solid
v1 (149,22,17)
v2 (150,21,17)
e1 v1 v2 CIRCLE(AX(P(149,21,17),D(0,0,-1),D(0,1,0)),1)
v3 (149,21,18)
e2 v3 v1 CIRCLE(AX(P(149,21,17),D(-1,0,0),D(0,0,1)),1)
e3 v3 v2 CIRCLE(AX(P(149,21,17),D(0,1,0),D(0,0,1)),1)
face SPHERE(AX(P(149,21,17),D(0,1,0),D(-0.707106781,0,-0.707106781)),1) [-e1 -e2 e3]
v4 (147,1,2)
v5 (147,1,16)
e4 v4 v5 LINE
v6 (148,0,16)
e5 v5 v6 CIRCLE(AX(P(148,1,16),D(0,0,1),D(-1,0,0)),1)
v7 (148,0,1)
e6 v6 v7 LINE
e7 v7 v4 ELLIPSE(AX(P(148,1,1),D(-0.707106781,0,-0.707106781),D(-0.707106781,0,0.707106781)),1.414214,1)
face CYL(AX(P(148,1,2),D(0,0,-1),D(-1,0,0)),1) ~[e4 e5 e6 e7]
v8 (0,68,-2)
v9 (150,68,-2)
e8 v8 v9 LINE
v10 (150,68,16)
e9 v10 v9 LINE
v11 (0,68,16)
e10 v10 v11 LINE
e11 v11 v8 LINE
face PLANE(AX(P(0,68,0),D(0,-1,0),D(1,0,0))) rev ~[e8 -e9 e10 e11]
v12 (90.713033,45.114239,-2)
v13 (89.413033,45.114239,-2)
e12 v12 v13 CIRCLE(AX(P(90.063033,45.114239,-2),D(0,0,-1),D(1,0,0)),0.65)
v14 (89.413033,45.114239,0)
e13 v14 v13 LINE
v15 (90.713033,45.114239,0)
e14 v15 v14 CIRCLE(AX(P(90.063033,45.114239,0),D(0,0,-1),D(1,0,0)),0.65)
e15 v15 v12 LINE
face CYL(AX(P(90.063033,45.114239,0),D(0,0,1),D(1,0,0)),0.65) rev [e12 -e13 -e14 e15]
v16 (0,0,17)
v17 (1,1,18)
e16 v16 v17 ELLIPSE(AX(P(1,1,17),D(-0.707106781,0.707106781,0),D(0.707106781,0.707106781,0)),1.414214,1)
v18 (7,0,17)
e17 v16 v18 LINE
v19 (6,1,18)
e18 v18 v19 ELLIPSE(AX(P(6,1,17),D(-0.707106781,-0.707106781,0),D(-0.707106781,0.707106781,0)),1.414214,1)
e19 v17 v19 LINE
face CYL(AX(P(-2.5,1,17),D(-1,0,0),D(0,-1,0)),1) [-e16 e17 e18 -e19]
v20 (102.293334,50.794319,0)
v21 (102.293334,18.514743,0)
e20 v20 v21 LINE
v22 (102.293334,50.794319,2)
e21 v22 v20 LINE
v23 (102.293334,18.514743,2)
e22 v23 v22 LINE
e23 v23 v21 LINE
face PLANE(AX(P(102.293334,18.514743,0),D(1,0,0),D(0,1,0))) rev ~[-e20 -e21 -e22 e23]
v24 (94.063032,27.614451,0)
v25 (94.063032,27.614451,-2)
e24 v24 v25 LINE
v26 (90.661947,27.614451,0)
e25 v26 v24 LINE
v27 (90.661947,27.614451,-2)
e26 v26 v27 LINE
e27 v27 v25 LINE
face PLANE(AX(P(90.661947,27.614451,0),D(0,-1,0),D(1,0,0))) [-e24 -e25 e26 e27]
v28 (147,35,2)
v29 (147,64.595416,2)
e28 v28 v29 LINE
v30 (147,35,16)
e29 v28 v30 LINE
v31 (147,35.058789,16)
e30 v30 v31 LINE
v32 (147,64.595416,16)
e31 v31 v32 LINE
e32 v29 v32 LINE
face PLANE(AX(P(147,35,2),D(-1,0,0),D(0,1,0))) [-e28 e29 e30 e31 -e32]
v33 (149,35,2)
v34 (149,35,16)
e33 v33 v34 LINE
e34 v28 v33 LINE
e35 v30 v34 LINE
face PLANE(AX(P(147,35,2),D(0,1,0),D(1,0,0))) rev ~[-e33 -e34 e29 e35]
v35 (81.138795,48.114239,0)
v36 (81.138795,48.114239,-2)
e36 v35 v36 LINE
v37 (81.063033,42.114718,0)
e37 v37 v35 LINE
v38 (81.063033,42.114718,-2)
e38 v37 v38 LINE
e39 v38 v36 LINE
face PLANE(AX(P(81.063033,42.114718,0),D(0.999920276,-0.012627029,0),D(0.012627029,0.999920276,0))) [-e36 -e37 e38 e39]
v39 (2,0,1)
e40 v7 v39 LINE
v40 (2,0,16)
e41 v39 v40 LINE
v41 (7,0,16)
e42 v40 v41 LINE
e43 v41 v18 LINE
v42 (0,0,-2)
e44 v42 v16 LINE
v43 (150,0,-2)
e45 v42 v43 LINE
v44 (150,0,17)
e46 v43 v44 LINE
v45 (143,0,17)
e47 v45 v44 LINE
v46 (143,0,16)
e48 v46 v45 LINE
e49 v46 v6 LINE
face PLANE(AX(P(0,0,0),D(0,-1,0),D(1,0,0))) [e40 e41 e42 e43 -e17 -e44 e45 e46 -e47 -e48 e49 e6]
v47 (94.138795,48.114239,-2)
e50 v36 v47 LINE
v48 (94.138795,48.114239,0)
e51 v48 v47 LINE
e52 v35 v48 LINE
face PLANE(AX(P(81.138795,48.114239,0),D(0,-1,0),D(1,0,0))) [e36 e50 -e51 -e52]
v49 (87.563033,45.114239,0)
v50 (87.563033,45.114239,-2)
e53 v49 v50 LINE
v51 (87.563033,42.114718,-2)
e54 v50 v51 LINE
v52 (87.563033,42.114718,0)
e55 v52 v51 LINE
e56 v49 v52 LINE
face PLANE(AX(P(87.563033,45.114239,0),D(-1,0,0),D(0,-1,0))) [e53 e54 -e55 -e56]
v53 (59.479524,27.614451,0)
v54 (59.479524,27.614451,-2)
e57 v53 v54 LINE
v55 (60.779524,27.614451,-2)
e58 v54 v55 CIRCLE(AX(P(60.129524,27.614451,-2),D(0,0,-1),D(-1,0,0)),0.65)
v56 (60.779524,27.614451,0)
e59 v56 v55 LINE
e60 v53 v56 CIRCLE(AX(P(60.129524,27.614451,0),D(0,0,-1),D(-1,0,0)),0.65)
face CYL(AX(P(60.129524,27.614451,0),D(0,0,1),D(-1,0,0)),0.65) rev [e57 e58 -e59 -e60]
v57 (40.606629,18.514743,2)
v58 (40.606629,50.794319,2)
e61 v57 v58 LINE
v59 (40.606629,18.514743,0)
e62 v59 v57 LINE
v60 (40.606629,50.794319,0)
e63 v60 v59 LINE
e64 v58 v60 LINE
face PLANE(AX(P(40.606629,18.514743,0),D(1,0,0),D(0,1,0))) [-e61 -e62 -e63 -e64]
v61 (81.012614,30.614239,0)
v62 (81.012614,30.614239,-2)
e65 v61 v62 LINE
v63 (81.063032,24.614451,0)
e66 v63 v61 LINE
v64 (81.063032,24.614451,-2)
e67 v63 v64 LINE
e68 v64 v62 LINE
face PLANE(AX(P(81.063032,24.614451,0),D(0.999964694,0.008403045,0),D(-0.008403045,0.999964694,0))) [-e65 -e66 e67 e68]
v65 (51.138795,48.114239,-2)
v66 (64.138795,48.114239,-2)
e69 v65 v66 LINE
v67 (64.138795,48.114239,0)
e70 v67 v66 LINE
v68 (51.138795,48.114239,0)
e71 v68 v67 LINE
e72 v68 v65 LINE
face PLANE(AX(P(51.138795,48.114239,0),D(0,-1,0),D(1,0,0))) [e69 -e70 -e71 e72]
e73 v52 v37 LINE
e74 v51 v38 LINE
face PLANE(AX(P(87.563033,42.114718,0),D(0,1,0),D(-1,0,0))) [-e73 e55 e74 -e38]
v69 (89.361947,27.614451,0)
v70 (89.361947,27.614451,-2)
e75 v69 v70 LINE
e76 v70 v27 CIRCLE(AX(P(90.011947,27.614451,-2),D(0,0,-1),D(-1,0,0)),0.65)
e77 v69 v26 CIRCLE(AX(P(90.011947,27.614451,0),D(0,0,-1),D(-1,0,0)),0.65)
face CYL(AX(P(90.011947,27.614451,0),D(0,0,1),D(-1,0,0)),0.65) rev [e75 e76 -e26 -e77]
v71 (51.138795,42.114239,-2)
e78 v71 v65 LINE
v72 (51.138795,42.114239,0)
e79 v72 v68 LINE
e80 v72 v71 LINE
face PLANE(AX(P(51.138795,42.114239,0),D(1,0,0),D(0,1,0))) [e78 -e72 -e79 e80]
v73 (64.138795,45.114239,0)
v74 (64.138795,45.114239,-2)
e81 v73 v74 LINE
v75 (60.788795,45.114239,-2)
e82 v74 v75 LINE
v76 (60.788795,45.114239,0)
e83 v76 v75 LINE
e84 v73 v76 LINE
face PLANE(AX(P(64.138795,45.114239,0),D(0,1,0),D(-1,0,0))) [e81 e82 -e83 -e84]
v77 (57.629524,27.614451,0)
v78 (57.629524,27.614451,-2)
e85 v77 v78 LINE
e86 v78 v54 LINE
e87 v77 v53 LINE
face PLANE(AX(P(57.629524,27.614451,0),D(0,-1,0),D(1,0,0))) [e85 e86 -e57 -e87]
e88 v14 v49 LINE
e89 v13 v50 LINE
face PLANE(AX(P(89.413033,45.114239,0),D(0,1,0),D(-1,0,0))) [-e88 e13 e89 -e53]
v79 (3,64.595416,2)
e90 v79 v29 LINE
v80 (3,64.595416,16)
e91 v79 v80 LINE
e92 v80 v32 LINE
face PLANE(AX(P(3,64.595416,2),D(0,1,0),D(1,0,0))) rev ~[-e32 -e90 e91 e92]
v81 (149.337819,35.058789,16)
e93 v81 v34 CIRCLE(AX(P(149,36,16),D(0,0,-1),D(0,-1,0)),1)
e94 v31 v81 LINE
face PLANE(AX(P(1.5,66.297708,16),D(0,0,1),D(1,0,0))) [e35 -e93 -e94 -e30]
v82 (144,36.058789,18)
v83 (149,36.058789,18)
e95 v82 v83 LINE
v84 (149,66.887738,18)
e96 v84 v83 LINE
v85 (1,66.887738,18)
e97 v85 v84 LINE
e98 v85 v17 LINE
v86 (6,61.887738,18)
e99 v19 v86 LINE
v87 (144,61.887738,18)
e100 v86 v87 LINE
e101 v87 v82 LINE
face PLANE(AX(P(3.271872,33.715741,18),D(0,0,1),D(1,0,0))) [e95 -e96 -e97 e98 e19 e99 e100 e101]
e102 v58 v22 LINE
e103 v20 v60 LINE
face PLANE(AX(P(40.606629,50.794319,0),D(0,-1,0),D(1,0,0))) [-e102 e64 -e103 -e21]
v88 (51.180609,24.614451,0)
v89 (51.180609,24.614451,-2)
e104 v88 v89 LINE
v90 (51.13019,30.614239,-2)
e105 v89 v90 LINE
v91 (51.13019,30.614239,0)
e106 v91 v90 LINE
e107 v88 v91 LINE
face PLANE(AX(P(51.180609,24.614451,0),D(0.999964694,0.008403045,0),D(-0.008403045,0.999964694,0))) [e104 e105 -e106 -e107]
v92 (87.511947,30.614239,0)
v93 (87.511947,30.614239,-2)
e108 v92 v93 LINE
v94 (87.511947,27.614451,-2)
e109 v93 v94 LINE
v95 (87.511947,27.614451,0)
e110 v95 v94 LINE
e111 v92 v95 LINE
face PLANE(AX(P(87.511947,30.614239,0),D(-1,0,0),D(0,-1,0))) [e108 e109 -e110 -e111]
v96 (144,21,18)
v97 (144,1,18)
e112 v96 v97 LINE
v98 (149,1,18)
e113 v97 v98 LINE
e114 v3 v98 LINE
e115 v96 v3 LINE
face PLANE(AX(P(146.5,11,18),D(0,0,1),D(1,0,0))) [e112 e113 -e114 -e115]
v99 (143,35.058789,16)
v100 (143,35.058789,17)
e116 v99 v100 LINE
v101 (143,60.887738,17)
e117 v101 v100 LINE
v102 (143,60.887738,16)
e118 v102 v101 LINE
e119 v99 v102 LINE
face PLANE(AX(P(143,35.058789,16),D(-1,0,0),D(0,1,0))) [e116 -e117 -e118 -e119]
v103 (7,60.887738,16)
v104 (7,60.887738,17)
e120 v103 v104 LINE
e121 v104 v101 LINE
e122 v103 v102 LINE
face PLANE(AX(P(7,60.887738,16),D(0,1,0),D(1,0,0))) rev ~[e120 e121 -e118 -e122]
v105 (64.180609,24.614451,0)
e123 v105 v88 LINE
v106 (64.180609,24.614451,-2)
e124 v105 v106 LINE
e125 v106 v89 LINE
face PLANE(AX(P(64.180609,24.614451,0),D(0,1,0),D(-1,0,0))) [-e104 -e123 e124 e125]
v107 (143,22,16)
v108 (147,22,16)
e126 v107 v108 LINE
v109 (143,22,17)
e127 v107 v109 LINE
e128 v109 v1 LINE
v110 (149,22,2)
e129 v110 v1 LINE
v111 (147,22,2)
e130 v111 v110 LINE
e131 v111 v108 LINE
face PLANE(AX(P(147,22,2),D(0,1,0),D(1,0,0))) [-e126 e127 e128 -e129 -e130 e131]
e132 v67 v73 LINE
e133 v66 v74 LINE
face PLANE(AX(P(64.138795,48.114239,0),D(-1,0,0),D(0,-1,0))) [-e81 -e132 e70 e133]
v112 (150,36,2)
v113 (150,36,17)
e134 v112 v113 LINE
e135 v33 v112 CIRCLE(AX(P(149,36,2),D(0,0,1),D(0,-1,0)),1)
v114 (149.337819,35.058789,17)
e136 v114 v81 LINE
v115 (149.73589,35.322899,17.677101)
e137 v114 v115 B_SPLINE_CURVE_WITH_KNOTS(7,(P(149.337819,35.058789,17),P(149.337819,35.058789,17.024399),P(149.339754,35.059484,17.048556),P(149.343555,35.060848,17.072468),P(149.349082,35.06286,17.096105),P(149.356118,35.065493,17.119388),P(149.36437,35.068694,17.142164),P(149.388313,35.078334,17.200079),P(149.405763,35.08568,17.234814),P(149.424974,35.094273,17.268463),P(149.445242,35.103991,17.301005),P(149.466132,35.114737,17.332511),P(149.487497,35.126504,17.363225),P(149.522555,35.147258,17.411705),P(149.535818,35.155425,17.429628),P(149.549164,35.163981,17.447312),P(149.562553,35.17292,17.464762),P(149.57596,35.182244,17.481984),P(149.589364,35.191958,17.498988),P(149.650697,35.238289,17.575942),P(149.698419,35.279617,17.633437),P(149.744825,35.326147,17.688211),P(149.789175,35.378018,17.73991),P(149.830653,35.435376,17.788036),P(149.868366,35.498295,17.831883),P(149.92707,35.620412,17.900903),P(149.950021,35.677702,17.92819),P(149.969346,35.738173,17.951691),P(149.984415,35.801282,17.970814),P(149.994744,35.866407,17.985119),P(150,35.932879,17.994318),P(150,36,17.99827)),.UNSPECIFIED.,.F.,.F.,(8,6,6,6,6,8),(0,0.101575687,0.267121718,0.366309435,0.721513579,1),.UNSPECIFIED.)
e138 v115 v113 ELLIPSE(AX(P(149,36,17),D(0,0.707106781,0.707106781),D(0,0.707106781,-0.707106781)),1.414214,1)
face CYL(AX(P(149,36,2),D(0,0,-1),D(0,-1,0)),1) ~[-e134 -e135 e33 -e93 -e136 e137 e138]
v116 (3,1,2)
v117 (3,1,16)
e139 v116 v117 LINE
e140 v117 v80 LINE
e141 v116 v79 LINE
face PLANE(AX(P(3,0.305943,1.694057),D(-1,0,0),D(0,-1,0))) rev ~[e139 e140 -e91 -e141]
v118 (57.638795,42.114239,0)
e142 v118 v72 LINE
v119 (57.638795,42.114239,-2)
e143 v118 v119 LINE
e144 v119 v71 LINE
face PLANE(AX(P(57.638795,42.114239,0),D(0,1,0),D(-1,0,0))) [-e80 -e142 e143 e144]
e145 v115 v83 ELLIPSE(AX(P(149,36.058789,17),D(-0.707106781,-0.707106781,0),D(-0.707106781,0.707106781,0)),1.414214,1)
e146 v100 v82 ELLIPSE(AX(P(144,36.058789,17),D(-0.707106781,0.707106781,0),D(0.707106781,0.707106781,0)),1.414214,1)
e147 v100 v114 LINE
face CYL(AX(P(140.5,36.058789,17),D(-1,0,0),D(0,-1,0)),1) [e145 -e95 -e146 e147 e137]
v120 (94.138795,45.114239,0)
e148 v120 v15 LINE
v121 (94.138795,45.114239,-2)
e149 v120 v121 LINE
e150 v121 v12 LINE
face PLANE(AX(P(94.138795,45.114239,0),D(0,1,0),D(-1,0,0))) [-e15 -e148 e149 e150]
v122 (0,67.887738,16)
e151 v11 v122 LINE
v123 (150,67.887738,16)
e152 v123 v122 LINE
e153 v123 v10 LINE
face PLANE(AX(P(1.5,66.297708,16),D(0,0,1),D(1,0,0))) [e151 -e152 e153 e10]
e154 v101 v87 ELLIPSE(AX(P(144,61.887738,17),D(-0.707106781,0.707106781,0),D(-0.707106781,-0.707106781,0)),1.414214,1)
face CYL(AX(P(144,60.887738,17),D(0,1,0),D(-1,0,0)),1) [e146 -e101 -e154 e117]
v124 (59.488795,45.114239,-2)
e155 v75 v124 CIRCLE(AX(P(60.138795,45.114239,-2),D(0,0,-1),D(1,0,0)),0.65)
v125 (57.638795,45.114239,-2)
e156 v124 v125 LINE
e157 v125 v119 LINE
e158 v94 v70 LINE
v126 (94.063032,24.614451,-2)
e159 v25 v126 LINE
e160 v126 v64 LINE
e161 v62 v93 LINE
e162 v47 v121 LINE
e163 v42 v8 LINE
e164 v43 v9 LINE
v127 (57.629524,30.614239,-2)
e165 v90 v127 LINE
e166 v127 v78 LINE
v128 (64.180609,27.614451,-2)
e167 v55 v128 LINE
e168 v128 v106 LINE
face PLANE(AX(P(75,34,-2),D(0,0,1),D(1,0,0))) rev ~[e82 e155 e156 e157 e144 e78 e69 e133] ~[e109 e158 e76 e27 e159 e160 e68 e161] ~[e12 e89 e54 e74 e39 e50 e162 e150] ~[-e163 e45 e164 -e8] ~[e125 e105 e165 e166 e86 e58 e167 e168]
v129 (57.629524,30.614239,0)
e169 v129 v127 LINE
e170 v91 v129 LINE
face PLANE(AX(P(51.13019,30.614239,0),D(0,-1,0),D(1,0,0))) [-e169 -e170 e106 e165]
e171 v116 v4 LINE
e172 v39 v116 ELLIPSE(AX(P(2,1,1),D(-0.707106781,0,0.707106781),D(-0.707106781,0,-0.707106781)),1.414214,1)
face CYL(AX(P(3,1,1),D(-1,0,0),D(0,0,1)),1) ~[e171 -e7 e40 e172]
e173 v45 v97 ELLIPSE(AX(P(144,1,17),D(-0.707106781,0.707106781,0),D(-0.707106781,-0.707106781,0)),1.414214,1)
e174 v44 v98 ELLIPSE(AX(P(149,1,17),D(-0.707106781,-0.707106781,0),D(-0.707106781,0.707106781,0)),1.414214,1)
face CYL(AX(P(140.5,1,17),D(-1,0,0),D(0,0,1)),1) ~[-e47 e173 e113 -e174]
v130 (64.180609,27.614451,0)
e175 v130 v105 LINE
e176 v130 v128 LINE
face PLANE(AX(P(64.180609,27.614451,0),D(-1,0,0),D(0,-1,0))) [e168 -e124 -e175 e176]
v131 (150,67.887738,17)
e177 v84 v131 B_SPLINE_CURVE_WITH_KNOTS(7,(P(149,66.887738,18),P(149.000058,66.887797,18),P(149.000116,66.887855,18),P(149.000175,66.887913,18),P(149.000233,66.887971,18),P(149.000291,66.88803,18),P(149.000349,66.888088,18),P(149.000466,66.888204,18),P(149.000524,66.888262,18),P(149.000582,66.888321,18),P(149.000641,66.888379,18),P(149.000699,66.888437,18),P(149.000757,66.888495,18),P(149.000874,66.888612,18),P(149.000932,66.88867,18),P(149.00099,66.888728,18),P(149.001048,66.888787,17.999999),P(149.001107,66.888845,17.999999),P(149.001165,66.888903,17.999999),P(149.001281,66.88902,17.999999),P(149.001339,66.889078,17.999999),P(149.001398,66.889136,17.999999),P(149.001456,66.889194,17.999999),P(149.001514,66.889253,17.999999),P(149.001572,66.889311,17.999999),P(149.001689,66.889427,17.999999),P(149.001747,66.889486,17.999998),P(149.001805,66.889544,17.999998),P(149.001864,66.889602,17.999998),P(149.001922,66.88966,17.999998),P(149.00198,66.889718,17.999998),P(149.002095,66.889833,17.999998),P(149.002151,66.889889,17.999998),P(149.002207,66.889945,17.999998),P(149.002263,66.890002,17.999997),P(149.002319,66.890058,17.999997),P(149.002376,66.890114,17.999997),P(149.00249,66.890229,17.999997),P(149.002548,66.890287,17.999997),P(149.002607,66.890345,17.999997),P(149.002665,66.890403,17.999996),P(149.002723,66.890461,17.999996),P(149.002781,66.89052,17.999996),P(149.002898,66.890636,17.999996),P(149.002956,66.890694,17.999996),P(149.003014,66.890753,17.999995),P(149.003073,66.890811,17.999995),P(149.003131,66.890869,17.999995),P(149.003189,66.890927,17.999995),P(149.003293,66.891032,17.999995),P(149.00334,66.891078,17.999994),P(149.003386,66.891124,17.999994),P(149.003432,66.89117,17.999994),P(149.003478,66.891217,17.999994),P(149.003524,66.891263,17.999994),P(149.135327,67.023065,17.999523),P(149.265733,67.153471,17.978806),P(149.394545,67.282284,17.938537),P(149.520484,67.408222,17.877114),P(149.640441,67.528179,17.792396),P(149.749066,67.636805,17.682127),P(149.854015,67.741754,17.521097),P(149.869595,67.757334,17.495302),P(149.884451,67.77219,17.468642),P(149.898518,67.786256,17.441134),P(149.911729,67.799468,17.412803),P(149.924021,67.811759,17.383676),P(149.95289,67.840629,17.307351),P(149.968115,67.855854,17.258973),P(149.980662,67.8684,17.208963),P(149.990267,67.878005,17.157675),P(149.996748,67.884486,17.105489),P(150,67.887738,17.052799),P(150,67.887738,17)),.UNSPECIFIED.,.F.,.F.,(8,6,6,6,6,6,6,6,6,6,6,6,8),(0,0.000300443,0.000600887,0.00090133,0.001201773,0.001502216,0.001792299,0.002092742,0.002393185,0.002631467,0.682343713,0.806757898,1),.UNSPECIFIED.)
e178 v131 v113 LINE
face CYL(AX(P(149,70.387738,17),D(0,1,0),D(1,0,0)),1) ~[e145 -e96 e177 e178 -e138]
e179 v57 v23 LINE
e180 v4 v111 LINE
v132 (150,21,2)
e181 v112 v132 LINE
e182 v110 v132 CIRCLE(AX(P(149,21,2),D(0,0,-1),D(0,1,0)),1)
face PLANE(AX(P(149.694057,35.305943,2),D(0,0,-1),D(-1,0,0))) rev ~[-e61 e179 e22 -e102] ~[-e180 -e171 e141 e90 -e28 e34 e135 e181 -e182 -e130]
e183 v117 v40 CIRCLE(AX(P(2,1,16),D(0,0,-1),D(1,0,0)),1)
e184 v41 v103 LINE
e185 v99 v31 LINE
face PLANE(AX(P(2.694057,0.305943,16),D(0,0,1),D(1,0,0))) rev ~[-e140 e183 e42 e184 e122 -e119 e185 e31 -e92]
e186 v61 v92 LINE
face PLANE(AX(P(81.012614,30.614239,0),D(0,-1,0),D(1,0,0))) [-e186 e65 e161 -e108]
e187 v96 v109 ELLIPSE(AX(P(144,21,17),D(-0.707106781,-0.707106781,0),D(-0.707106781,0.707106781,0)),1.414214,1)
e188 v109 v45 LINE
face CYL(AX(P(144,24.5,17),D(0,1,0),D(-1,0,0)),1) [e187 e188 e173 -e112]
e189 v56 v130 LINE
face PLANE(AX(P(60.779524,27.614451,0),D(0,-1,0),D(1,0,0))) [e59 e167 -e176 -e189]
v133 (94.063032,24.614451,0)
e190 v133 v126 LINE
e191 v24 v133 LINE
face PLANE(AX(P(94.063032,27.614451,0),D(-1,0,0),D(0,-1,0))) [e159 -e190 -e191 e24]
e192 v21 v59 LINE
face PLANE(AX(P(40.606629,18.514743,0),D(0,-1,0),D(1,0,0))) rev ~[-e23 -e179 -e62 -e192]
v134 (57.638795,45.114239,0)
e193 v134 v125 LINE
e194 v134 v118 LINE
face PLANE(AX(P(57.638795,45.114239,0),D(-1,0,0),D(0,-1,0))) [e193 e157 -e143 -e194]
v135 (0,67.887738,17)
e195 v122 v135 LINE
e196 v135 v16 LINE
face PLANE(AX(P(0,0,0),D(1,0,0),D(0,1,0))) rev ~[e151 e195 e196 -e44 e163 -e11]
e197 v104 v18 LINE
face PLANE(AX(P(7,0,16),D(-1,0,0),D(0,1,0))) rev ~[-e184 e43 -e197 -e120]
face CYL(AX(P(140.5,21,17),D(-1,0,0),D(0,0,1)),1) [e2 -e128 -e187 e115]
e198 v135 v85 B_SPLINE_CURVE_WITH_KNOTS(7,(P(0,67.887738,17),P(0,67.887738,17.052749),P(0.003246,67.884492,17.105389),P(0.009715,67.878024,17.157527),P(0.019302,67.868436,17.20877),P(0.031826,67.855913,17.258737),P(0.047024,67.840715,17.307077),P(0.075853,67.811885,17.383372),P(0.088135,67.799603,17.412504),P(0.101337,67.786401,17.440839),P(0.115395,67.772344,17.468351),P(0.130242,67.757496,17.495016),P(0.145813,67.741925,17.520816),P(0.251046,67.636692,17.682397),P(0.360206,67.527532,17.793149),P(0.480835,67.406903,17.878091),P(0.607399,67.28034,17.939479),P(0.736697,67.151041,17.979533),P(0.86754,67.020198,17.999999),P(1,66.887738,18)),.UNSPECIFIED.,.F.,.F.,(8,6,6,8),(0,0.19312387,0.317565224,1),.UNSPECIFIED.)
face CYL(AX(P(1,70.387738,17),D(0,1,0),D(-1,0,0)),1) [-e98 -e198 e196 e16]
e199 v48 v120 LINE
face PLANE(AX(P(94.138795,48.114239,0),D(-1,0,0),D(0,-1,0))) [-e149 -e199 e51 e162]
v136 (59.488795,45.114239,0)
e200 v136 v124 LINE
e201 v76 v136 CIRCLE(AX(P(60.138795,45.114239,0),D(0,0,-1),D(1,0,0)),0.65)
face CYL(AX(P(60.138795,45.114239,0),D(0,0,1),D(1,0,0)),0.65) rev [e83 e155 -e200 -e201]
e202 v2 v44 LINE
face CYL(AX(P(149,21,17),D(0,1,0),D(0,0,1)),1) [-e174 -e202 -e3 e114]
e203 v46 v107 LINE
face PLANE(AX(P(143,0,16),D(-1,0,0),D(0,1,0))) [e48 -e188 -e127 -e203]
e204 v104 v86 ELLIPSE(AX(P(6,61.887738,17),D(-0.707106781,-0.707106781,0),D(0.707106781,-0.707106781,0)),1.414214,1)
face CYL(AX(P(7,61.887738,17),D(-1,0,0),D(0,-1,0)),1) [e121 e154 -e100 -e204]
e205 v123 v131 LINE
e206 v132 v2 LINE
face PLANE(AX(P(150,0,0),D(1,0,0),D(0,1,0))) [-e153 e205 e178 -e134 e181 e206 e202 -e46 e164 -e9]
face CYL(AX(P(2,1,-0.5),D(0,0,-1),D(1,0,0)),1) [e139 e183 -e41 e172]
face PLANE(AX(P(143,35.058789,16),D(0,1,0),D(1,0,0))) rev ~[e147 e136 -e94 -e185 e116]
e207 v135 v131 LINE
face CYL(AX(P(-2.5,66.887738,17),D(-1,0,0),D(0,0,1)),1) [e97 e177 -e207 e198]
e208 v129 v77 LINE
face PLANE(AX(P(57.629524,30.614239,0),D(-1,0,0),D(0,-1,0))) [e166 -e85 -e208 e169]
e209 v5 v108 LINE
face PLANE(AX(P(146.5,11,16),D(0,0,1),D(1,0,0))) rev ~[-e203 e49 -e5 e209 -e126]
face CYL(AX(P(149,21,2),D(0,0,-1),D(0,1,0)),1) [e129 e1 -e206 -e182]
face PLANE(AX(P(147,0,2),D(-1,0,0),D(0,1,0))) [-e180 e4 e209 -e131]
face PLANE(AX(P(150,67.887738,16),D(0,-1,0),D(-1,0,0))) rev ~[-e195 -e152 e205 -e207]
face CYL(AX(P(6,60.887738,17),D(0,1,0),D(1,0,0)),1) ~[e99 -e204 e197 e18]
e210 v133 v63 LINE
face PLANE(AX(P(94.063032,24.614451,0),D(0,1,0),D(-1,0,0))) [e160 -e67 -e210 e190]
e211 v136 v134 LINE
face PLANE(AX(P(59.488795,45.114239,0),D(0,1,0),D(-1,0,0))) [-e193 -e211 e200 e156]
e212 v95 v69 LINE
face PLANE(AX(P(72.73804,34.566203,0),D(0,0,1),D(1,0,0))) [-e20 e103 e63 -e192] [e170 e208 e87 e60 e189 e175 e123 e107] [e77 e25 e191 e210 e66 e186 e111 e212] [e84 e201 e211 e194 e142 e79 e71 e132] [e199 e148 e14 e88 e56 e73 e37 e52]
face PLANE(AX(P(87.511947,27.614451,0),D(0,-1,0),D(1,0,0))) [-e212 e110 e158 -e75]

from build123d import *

# Parameters (mm, degrees)
F0_W         = 150
F0_H         = 68
F0_W_2       = 61.6867046999
F0_H_2       = 32.2795761846
F1_DEPTH     = 2
F2_W         = 3
F2_H         = 3.4045838118
F2_W_2       = 144
F2_H_2       = 64.5954161882
F2_H_3       = 29.5954161882
F2_H_4       = 22
F3_DEPTH     = 14
F4_W         = 4.8811412584
F4_H         = 7
F4_W_2       = 136
F4_W_3       = 7
F4_H_2       = 25.8289493918
F4_H_3       = 22
F5_DEPTH     = 2
F6_T1_DEPTH  = 72.8877383471
F6_T3_DEPTH  = 12
F6_T5_DEPTH  = 63.3877383471
F6_T7_DEPTH  = 136
F6_T9_DEPTH  = 28.3289493918
F6_T11_DEPTH = 12
F6_T13_DEPTH = 37.8289493918
F6_T15_DEPTH = 155
F6_T17_DEPTH = 23.5
F6_T19_DEPTH = 8.5
F6_T21_DEPTH = 27
F6_T23_DEPTH = 144
F6_T25_DEPTH = 14
F6_T27_DEPTH = 15
F6_T29_DEPTH = 16.5
F6_S33_W     = 1
F6_S33_H     = 1
F6_T34_DEPTH = 1
F6_T41_DEPTH = 65.8877383471
F6_T45_DEPTH = 138.5
F6_T52_DEPTH = 138.5
F6_T56_DEPTH = 30.8289493918
F6_T63_DEPTH = 146.5
F6_T67_DEPTH = 16.5
F6_T74_DEPTH = 146.5
F6_T78_DEPTH = 16.5
F7_W         = 150
F7_H         = 68
F7_W_2       = 61.6867046999
F7_H_2       = 32.2795761846
F8_DEPTH     = 2
F9_W         = 73.8973718075
F9_H         = 39.0960725045
F9_W_2       = 61.6867046999
F9_H_2       = 32.2795761846
F10_DEPTH    = 2


# Not quite as in the source:
# - a fillet or chamfer that OpenCascade refuses, or shapes differently, is made with other operations: its cross-section is extruded or revolved along the edge and cut away or added
# - a feature names something its author has since deleted; it is built from what else it names


with BuildPart() as f1:
    # F0 (on Top) → F1 (new body)
    with BuildSketch(Plane.XY):
        with Locations((75, 34)):
            Rectangle(F0_W, F0_H)
        with Locations((71.4499814534, 34.6545311671)):
            Rectangle(F0_W_2, F0_H_2, mode=Mode.SUBTRACT)
    extrude(amount=F1_DEPTH)

    # F2 (on face) → F3 (join)
    with BuildSketch(Plane.XY.offset(2)):
        with Locations((1.5, 66.2977080941)):
            Rectangle(F2_W, F2_H)
        with Locations((75, 66.2977080941)):
            Rectangle(F2_W_2, F2_H)
        with Locations((1.5, 32.2977080941)):
            Rectangle(F2_W, F2_H_2)
        with Locations((148.5, 66.2977080941)):
            Rectangle(F2_W, F2_H)
        with Locations((148.5, 49.7977080941)):
            Rectangle(F2_W, F2_H_3)
        with Locations((148.5, 11)):
            Rectangle(F2_W, F2_H_4)
    extrude(amount=F3_DEPTH)

    # F4 (on face) → F5 (join)
    with BuildSketch(Plane.XY.offset(16)):
        Polygon((0, 67.8877383471), (0, 0), (7, 0), (7, 60.8877383471), (2.1188587416, 60.8877383471), (2.1188587416, 67.8877383471), align=None)
        with Locations((4.5594293708, 64.3877383471)):
            Rectangle(F4_W, F4_H)
        with Locations((75, 64.3877383471)):
            Rectangle(F4_W_2, F4_H)
        with Locations((146.5, 64.3877383471)):
            Rectangle(F4_W_3, F4_H)
        with Locations((146.5, 47.9732636511)):
            Rectangle(F4_W_3, F4_H_2)
        with Locations((146.5, 11)):
            Rectangle(F4_W_3, F4_H_3)
    extrude(amount=F5_DEPTH)

    # F6: fillet of radius 1 on 17 edges, made by hand

    # F6_s2 → F6_t1 (cut)
    with BuildSketch(Plane.XZ.offset(-70.3877383471)):
        with BuildLine():
            ThreePointArc((0, 17), (0.2928932188, 17.7071067812), (1, 18))
            Line((1, 18), (0, 18))
            Line((0, 18), (0, 17))
        make_face()
    extrude(amount=F6_T1_DEPTH, mode=Mode.SUBTRACT)

    # F6_s4 → F6_t3 (cut)
    with BuildSketch(Plane.YZ.offset(-2.5)):
        with BuildLine():
            ThreePointArc((0, 17), (0.2928932188, 17.7071067812), (1, 18))
            Line((1, 18), (0, 18))
            Line((0, 18), (0, 17))
        make_face()
    extrude(amount=F6_T3_DEPTH, mode=Mode.SUBTRACT)

    # F6_s6 → F6_t5 (cut)
    with BuildSketch(Plane.XZ.offset(-60.8877383471)):
        with BuildLine():
            ThreePointArc((7, 17), (6.7071067812, 17.7071067812), (6, 18))
            Line((6, 18), (7, 18))
            Line((7, 18), (7, 17))
        make_face()
    extrude(amount=F6_T5_DEPTH, mode=Mode.SUBTRACT)

    # F6_s8 → F6_t7 (cut)
    with BuildSketch(Plane.YZ.offset(7)):
        with BuildLine():
            ThreePointArc((60.8877383471, 17), (61.1806315659, 17.7071067812), (61.8877383471, 18))
            Line((61.8877383471, 18), (60.8877383471, 18))
            Line((60.8877383471, 18), (60.8877383471, 17))
        make_face()
    extrude(amount=F6_T7_DEPTH, mode=Mode.SUBTRACT)

    # F6_s10 → F6_t9 (cut)
    with BuildSketch(Plane.XZ.offset(-60.8877383471)):
        with BuildLine():
            ThreePointArc((143, 17), (143.2928932188, 17.7071067812), (144, 18))
            Line((144, 18), (143, 18))
            Line((143, 18), (143, 17))
        make_face()
    extrude(amount=F6_T9_DEPTH, mode=Mode.SUBTRACT)

    # F6_s12 → F6_t11 (cut)
    with BuildSketch(Plane.YZ.offset(140.5)):
        with BuildLine():
            ThreePointArc((35.0587889552, 17), (35.351682174, 17.7071067812), (36.0587889552, 18))
            Line((36.0587889552, 18), (35.0587889552, 18))
            Line((35.0587889552, 18), (35.0587889552, 17))
        make_face()
        with BuildLine():
            ThreePointArc((1, 18), (0.2928932188, 17.7071067812), (0, 17))
            Line((0, 17), (0, 18))
            Line((0, 18), (1, 18))
        make_face()
    extrude(amount=F6_T11_DEPTH, mode=Mode.SUBTRACT)

    # F6_s14 → F6_t13 (cut)
    with BuildSketch(Plane.XZ.offset(-70.3877383471)):
        with BuildLine():
            ThreePointArc((150, 17), (149.7071067812, 17.7071067812), (149, 18))
            Line((149, 18), (150, 18))
            Line((150, 18), (150, 17))
        make_face()
    extrude(amount=F6_T13_DEPTH, mode=Mode.SUBTRACT)

    # F6_s16 → F6_t15 (cut)
    with BuildSketch(Plane.YZ.offset(-2.5)):
        with BuildLine():
            ThreePointArc((66.8877383471, 18), (67.5948451282, 17.7071067812), (67.8877383471, 17))
            Line((67.8877383471, 17), (67.8877383471, 18))
            Line((67.8877383471, 18), (66.8877383471, 18))
        make_face()
    extrude(amount=F6_T15_DEPTH, mode=Mode.SUBTRACT)

    # F6_s18 → F6_t17 (cut)
    with BuildSketch(Plane.XZ.offset(-21)):
        with BuildLine():
            ThreePointArc((149, 18), (149.7071067812, 17.7071067812), (150, 17))
            Line((150, 17), (150, 18))
            Line((150, 18), (149, 18))
        make_face()
    extrude(amount=F6_T17_DEPTH, mode=Mode.SUBTRACT)

    # F6_s20 → F6_t19 (cut)
    with BuildSketch(Plane.YZ.offset(140.5)):
        with BuildLine():
            ThreePointArc((21, 18), (21.7071067812, 17.7071067812), (22, 17))
            Line((22, 17), (22, 18))
            Line((22, 18), (21, 18))
        make_face()
    extrude(amount=F6_T19_DEPTH, mode=Mode.SUBTRACT)

    # F6_s22 → F6_t21 (cut)
    with BuildSketch(Plane.XZ.offset(-24.5)):
        with BuildLine():
            ThreePointArc((143, 17), (143.2928932188, 17.7071067812), (144, 18))
            Line((144, 18), (143, 18))
            Line((143, 18), (143, 17))
        make_face()
    extrude(amount=F6_T21_DEPTH, mode=Mode.SUBTRACT)

    # F6_s24 → F6_t23 (cut)
    with BuildSketch(Plane.YZ.offset(3)):
        with BuildLine():
            ThreePointArc((1, 2), (0.2928932188, 1.7071067812), (0, 1))
            Line((0, 1), (0, 2))
            Line((0, 2), (1, 2))
        make_face()
    extrude(amount=F6_T23_DEPTH, mode=Mode.SUBTRACT)

    # F6_s26 → F6_t25 (cut)
    with BuildSketch(Plane.XY.offset(2)):
        with BuildLine():
            ThreePointArc((3, 1), (2.7071067812, 0.2928932188), (2, 0))
            Line((2, 0), (3, 0))
            Line((3, 0), (3, 1))
        make_face()
        with BuildLine():
            ThreePointArc((147, 1), (147.2928932188, 0.2928932188), (148, 0))
            Line((148, 0), (147, 0))
            Line((147, 0), (147, 1))
        make_face()
    extrude(amount=F6_T25_DEPTH, mode=Mode.SUBTRACT)

    # F6_s28 → F6_t27 (cut)
    with BuildSketch(Plane.XY.offset(2)):
        with BuildLine():
            ThreePointArc((149, 22), (149.7071067812, 21.7071067812), (150, 21))
            Line((150, 21), (150, 22))
            Line((150, 22), (149, 22))
        make_face()
    extrude(amount=F6_T27_DEPTH, mode=Mode.SUBTRACT)

    # F6_s30 → F6_t29 (cut)
    with BuildSketch(Plane.XY.offset(2)):
        with BuildLine():
            ThreePointArc((149, 35), (149.7071067812, 35.2928932188), (150, 36))
            Line((150, 36), (150, 35))
            Line((150, 35), (149, 35))
        make_face()
    extrude(amount=F6_T29_DEPTH, mode=Mode.SUBTRACT)


with BuildPart() as f6_tool32:
    # F6_s33 → F6_t34 (new body)
    with BuildSketch(Plane.XZ.offset(-21)):
        with Locations((149.5, 17.5)):
            Rectangle(F6_S33_W, F6_S33_H)
    extrude(amount=-F6_T34_DEPTH)

    # F6_s35 → F6_t36 (revolve, cut)
    with BuildSketch(Plane(origin=(149, 21, 17), x_dir=(-0.7071067812, 0, -0.7071067812), z_dir=(0.7071067812, 0, -0.7071067812))):
        with BuildLine():
            ThreePointArc((0, -1), (1, 0), (0, 1))
            Line((0, 1), (0, -1))
        make_face()
    revolve(axis=Axis((149, 21, 17), (0, 1, 0)), mode=Mode.SUBTRACT)


with BuildPart() as f1_1:
    add(f1.part)

    # F6_t31: cut F6_tool32
    add(f6_tool32.part, mode=Mode.SUBTRACT)


with BuildPart() as f6_tool39:
    # F6_s40 → F6_t41 (new body)
    with BuildSketch(Plane.XZ.offset(2.5)):
        with BuildLine():
            ThreePointArc((7, 17), (6.7071067812, 17.7071067812), (6, 18))
            Line((6, 18), (7, 18))
            Line((7, 18), (7, 17))
        make_face()
    extrude(amount=-F6_T41_DEPTH)

    split(bisect_by=Plane.XZ.offset(-60.8877383471), keep=Keep.BOTTOM)


with BuildPart() as f6_tool43:
    # F6_s44 → F6_t45 (new body)
    with BuildSketch(Plane.YZ.offset(4.5)):
        with BuildLine():
            ThreePointArc((60.8877383471, 17), (61.1806315659, 17.7071067812), (61.8877383471, 18))
            Line((61.8877383471, 18), (60.8877383471, 18))
            Line((60.8877383471, 18), (60.8877383471, 17))
        make_face()
    extrude(amount=F6_T45_DEPTH)

    split(bisect_by=Plane.YZ.offset(7), keep=Keep.BOTTOM)


with BuildPart() as f6_tool39_1:
    add(f6_tool39.part)

    # F6_t47: intersect F6_tool43
    add(f6_tool43.part, mode=Mode.INTERSECT)


with BuildPart() as f1_2:
    add(f1_1.part)

    # F6_t37: cut F6_tool39
    add(f6_tool39_1.part, mode=Mode.SUBTRACT)


with BuildPart() as f6_tool50:
    # F6_s51 → F6_t52 (new body)
    with BuildSketch(Plane.YZ.offset(7)):
        with BuildLine():
            ThreePointArc((60.8877383471, 17), (61.1806315659, 17.7071067812), (61.8877383471, 18))
            Line((61.8877383471, 18), (60.8877383471, 18))
            Line((60.8877383471, 18), (60.8877383471, 17))
        make_face()
    extrude(amount=F6_T52_DEPTH)

    split(bisect_by=Plane.YZ.offset(143), keep=Keep.TOP)


with BuildPart() as f6_tool54:
    # F6_s55 → F6_t56 (new body)
    with BuildSketch(Plane.XZ.offset(-63.3877383471)):
        with BuildLine():
            ThreePointArc((143, 17), (143.2928932188, 17.7071067812), (144, 18))
            Line((144, 18), (143, 18))
            Line((143, 18), (143, 17))
        make_face()
    extrude(amount=F6_T56_DEPTH)

    split(bisect_by=Plane.XZ.offset(-60.8877383471), keep=Keep.BOTTOM)


with BuildPart() as f6_tool50_1:
    add(f6_tool50.part)

    # F6_t58: intersect F6_tool54
    add(f6_tool54.part, mode=Mode.INTERSECT)


with BuildPart() as f1_3:
    add(f1_2.part)

    # F6_t48: cut F6_tool50
    add(f6_tool50_1.part, mode=Mode.SUBTRACT)


with BuildPart() as f6_tool61:
    # F6_s62 → F6_t63 (new body)
    with BuildSketch(Plane.YZ.offset(0.5)):
        with BuildLine():
            ThreePointArc((1, 2), (0.2928932188, 1.7071067812), (0, 1))
            Line((0, 1), (0, 2))
            Line((0, 2), (1, 2))
        make_face()
    extrude(amount=F6_T63_DEPTH)

    split(bisect_by=Plane.YZ.offset(3), keep=Keep.BOTTOM)


with BuildPart() as f6_tool65:
    # F6_s66 → F6_t67 (new body)
    with BuildSketch(Plane.XY.offset(-0.5)):
        with BuildLine():
            ThreePointArc((3, 1), (2.7071067812, 0.2928932188), (2, 0))
            Line((2, 0), (3, 0))
            Line((3, 0), (3, 1))
        make_face()
    extrude(amount=F6_T67_DEPTH)

    split(bisect_by=Plane.XY.offset(2), keep=Keep.BOTTOM)


with BuildPart() as f6_tool61_1:
    add(f6_tool61.part)

    # F6_t69: intersect F6_tool65
    add(f6_tool65.part, mode=Mode.INTERSECT)


with BuildPart() as f1_4:
    add(f1_3.part)

    # F6_t59: cut F6_tool61
    add(f6_tool61_1.part, mode=Mode.SUBTRACT)


with BuildPart() as f6_tool72:
    # F6_s73 → F6_t74 (new body)
    with BuildSketch(Plane.YZ.offset(3)):
        with BuildLine():
            ThreePointArc((1, 2), (0.2928932188, 1.7071067812), (0, 1))
            Line((0, 1), (0, 2))
            Line((0, 2), (1, 2))
        make_face()
    extrude(amount=F6_T74_DEPTH)

    split(bisect_by=Plane.YZ.offset(147), keep=Keep.TOP)


with BuildPart() as f6_tool76:
    # F6_s77 → F6_t78 (new body)
    with BuildSketch(Plane.XY.offset(-0.5)):
        with BuildLine():
            ThreePointArc((147, 1), (147.2928932188, 0.2928932188), (148, 0))
            Line((148, 0), (147, 0))
            Line((147, 0), (147, 1))
        make_face()
    extrude(amount=F6_T78_DEPTH)

    split(bisect_by=Plane.XY.offset(2), keep=Keep.BOTTOM)


with BuildPart() as f6_tool72_1:
    add(f6_tool72.part)

    # F6_t80: intersect F6_tool76
    add(f6_tool76.part, mode=Mode.INTERSECT)


with BuildPart() as f1_5:
    add(f1_4.part)

    # F6_t70: cut F6_tool72
    add(f6_tool72_1.part, mode=Mode.SUBTRACT)

    # F7 (on face) → F8 (join)
    with BuildSketch(Plane.XY):
        with Locations((75, 34)):
            Rectangle(F7_W, F7_H)
        with Locations((71.4499814534, 34.6545311671)):
            Rectangle(F7_W_2, F7_H_2, mode=Mode.SUBTRACT)
    extrude(amount=-F8_DEPTH)

    # F9 (on face) → F10 (join)
    with BuildSketch(Plane.XY):
        with Locations((72.7380400409, 34.5662031323)):
            Rectangle(F9_W, F9_H)
        with Locations((71.4499814534, 34.6545311671)):
            Rectangle(F9_W_2, F9_H_2, mode=Mode.SUBTRACT)
        with Locations((71.4499814534, 34.6545311671)):
            Rectangle(F9_W_2, F9_H_2)
        with BuildLine():
            Line((64.1806087643, 24.6144512218), (51.1806087643, 24.6144512218))
            Line((51.1806087643, 24.6144512218), (51.1301904917, 30.6142393845))
            Line((51.1301904917, 30.6142393845), (57.6295237077, 30.6142393845))
            Line((57.6295237077, 30.6142393845), (57.6295237077, 27.6144512218))
            Line((57.6295237077, 27.6144512218), (59.4795237077, 27.6144512218))
            ThreePointArc((59.4795237077, 27.6144512218), (60.1295237077, 28.2644512218), (60.7795237077, 27.6144512218))
            Line((60.7795237077, 27.6144512218), (64.1806087643, 27.6144512218))
            Line((64.1806087643, 27.6144512218), (64.1806087643, 24.6144512218))
        make_face(mode=Mode.SUBTRACT)
        with BuildLine():
            Line((94.0630321503, 24.6144512218), (81.0630321503, 24.6144512218))
            Line((81.0630321503, 24.6144512218), (81.0126138777, 30.6142393845))
            Line((81.0126138777, 30.6142393845), (87.5119470937, 30.6142393845))
            Line((87.5119470937, 30.6142393845), (87.5119470937, 27.6144512218))
            Line((87.5119470937, 27.6144512218), (89.3619470937, 27.6144512218))
            ThreePointArc((89.3619470937, 27.6144512218), (90.0119470937, 28.2644512218), (90.6619470937, 27.6144512218))
            Line((90.6619470937, 27.6144512218), (94.0630321503, 27.6144512218))
            Line((94.0630321503, 27.6144512218), (94.0630321503, 24.6144512218))
        make_face(mode=Mode.SUBTRACT)
        with BuildLine():
            Line((51.1387947655, 42.1142393845), (51.1387947655, 48.1142393845))
            Line((51.1387947655, 48.1142393845), (64.1387947655, 48.1142393845))
            Line((64.1387947655, 48.1142393845), (64.1387947655, 45.1142393845))
            Line((64.1387947655, 45.1142393845), (60.7887947655, 45.1142393845))
            ThreePointArc((60.7887947655, 45.1142393845), (60.1387947655, 44.4642393845), (59.4887947655, 45.1142393845))
            Line((59.4887947655, 45.1142393845), (57.6387947655, 45.1142393845))
            Line((57.6387947655, 45.1142393845), (57.6387947655, 42.1142393845))
            Line((57.6387947655, 42.1142393845), (51.1387947655, 42.1142393845))
        make_face(mode=Mode.SUBTRACT)
        with BuildLine():
            Line((81.063032589, 42.1147177292), (81.1387947655, 48.1142393845))
            Line((81.1387947655, 48.1142393845), (94.1387947655, 48.1142393845))
            Line((94.1387947655, 48.1142393845), (94.1387947655, 45.1142393845))
            Line((94.1387947655, 45.1142393845), (90.713032589, 45.1142393845))
            ThreePointArc((90.713032589, 45.1142393845), (90.063032589, 44.4642393845), (89.413032589, 45.1142393845))
            Line((89.413032589, 45.1142393845), (87.563032589, 45.1142393845))
            Line((87.563032589, 45.1142393845), (87.563032589, 42.1147177292))
            Line((87.563032589, 42.1147177292), (81.063032589, 42.1147177292))
        make_face(mode=Mode.SUBTRACT)
    extrude(amount=-F10_DEPTH)


solid = f1_5.part
